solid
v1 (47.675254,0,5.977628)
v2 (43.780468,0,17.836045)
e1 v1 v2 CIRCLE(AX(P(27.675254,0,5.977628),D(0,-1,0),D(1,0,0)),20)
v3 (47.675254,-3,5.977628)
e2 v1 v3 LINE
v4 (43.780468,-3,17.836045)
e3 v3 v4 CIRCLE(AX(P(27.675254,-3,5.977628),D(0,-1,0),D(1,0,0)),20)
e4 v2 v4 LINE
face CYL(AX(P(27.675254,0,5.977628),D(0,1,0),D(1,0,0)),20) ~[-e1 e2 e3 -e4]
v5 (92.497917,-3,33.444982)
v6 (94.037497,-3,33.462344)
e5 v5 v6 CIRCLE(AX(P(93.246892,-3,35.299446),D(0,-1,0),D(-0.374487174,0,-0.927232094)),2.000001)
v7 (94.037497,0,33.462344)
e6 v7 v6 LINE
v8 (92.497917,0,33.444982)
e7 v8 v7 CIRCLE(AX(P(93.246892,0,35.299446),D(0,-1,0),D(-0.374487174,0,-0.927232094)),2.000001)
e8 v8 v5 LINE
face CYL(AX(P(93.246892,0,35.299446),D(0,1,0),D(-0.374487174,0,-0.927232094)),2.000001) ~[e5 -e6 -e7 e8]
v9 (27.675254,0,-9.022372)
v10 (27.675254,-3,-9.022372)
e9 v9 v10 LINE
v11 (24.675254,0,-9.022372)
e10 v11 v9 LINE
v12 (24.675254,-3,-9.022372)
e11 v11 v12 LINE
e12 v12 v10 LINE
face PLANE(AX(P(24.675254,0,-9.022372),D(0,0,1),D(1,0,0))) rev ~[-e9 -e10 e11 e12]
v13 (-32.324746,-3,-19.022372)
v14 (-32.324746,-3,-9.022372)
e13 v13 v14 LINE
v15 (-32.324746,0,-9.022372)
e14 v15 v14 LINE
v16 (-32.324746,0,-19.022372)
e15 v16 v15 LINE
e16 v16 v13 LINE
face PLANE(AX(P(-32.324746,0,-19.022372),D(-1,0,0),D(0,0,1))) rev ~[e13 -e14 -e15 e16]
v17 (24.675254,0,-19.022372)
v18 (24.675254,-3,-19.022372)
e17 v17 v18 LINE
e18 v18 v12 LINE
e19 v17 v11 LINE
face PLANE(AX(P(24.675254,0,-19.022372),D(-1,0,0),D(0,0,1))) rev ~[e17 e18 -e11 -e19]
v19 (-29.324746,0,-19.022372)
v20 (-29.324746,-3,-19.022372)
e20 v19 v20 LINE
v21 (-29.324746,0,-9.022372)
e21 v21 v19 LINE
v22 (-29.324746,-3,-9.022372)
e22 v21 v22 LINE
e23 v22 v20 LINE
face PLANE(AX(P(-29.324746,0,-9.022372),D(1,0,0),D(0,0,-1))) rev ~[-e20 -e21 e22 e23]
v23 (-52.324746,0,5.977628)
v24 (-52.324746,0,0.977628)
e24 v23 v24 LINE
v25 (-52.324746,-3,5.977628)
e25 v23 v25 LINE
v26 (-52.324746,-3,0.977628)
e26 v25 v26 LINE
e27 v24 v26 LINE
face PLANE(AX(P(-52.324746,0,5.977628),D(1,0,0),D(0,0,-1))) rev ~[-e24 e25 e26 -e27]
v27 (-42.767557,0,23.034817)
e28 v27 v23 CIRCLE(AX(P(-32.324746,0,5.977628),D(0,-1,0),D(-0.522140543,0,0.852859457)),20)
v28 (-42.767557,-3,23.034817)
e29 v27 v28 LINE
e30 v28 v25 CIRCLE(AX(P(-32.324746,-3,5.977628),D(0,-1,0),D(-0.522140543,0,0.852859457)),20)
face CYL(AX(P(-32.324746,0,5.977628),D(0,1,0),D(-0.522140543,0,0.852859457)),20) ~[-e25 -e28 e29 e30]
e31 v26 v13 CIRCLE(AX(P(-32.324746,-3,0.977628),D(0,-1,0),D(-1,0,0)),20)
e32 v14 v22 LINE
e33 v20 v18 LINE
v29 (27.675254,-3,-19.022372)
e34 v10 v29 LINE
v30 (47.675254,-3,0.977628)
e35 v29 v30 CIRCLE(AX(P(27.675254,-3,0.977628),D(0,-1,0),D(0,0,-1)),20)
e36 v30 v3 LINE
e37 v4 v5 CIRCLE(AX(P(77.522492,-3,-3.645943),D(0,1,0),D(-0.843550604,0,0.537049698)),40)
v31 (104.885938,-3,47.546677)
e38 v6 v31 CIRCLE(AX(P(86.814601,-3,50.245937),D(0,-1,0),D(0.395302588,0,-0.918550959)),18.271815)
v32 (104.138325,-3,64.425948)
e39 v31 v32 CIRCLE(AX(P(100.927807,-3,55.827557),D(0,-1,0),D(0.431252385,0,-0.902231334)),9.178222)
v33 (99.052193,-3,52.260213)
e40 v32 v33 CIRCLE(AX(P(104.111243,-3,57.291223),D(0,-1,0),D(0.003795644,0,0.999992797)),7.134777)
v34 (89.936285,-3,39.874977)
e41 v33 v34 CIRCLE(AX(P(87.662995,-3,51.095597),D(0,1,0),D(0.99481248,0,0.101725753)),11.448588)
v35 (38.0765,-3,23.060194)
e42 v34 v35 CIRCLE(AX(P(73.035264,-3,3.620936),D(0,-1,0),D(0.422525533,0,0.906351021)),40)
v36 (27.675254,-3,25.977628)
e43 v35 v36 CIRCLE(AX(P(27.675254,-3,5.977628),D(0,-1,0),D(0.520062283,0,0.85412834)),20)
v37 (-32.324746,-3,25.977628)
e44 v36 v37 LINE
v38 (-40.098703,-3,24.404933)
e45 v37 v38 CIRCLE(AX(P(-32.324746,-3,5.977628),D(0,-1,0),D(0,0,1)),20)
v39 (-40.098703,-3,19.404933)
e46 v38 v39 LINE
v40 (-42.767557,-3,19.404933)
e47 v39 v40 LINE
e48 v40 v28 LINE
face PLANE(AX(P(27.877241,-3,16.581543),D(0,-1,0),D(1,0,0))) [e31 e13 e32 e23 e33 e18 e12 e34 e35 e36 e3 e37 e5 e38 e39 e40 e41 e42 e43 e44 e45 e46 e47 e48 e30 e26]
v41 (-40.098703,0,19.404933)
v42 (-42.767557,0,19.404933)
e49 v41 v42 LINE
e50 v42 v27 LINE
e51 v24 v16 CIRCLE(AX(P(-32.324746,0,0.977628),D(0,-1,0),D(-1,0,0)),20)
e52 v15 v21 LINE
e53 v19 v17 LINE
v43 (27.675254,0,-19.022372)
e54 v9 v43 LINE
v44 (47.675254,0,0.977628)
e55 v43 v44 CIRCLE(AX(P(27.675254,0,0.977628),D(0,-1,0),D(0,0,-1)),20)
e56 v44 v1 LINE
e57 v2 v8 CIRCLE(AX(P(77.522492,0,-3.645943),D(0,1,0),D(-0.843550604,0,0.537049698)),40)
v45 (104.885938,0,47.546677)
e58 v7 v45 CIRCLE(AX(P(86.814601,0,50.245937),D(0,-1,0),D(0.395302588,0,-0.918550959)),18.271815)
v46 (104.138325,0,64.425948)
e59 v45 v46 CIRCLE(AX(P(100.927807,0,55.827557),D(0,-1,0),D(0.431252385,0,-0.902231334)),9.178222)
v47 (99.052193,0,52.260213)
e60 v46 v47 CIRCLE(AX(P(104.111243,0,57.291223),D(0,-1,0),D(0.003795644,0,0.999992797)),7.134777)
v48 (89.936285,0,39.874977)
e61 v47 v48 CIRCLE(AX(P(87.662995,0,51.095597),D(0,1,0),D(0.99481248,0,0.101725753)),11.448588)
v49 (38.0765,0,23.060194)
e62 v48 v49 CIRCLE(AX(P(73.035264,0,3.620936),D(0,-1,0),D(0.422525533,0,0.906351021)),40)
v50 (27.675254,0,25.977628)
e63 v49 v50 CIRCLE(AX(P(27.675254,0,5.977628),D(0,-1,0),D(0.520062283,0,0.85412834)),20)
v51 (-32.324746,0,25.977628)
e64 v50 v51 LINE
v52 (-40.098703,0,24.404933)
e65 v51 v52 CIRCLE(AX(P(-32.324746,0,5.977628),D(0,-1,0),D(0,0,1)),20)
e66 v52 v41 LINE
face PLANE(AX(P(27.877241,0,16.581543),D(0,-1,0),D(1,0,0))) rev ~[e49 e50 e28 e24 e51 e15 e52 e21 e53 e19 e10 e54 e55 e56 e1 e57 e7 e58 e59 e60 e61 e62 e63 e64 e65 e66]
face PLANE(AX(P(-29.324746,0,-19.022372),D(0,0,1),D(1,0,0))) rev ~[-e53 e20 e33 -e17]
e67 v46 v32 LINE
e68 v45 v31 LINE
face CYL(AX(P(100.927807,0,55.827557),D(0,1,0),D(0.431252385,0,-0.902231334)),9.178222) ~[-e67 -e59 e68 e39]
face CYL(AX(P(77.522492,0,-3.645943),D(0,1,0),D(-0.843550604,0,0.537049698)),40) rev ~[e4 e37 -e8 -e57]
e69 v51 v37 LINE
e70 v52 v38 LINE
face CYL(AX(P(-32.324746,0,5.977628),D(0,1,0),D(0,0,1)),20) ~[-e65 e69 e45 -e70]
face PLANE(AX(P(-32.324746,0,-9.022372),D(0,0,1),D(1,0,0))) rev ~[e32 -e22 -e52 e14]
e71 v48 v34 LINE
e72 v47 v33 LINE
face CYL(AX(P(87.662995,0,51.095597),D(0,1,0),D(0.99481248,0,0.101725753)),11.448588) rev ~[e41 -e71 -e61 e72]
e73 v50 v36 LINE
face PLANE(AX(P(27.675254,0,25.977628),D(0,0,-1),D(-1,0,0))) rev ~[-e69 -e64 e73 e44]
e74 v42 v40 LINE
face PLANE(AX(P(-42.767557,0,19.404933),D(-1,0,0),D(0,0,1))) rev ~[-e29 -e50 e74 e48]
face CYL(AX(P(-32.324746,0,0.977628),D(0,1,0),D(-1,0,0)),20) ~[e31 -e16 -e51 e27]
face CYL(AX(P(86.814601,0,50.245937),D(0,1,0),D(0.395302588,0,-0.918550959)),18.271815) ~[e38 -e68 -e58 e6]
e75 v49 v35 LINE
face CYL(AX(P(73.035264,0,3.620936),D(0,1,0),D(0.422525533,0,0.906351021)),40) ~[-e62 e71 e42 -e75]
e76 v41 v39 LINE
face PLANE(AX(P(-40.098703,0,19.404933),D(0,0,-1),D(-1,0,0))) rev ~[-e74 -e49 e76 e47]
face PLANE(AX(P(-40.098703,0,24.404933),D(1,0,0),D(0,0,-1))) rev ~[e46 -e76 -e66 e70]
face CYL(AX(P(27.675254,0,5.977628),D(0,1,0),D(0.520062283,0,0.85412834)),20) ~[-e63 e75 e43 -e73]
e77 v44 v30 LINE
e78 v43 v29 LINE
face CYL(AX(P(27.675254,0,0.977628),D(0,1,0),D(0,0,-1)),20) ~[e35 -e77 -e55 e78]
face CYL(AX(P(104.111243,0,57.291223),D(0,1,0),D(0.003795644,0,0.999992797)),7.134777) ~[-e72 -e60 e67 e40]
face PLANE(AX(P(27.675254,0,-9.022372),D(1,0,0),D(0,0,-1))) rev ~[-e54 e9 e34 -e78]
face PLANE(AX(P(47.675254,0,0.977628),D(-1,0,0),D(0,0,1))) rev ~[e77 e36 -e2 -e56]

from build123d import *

# Parameters (mm, degrees)
F1_DEPTH = 3


# Not quite as in the source:
# - ends of sketch curves that miss each other by under 0.0002 mm in the source are joined


with BuildPart() as f1:
    # F0 (on Front) → F1 (new body)
    with BuildSketch(Plane.XZ):
        with BuildLine():
            Line((27.6752540097, 25.9776275605), (-32.3247459903, 25.9776275605))
            ThreePointArc((-32.3247459903, 25.9776275605), (-36.2904670893, 25.5805114342), (-40.0987030081, 24.4049331771))
            Line((-40.0987030081, 24.4049331771), (-40.0987030081, 19.4049331771))
            Line((-40.0987030081, 19.4049331771), (-42.7675568515, 19.4049331771))
            Line((-42.7675568515, 19.4049331771), (-42.7675568515, 23.0348166993))
            ThreePointArc((-42.7675568515, 23.0348166993), (-49.7726143017, 15.7537152948), (-52.3247459903, 5.9776275605))
            Line((-52.3247459903, 5.9776275605), (-52.3247459903, 0.9776275605))
            ThreePointArc((-52.3247459903, 0.9776275605), (-46.4668816141, -13.1645080632), (-32.3247459903, -19.0223724395))
            Line((-32.3247459903, -19.0223724395), (-32.3247459903, -9.0223724395))
            Line((-32.3247459903, -9.0223724395), (-29.3247459903, -9.0223724395))
            Line((-29.3247459903, -9.0223724395), (-29.3247459903, -19.0223724395))
            Line((-29.3247459903, -19.0223724395), (24.6752540097, -19.0223724395))
            Line((24.6752540097, -19.0223724395), (24.6752540097, -9.0223724395))
            Line((24.6752540097, -9.0223724395), (27.6752540097, -9.0223724395))
            Line((27.6752540097, -9.0223724395), (27.6752540097, -19.0223724395))
            ThreePointArc((27.6752540097, -19.0223724395), (41.8173896334, -13.1645080632), (47.6752540097, 0.9776275605))
            Line((47.6752540097, 0.9776275605), (47.6752540097, 5.9776275605))
            ThreePointArc((47.6752540097, 5.9776275605), (46.6766261397, 12.2184493954), (43.7804682921, 17.8360453688))
            ThreePointArc((43.7804682921, 17.8360453688), (65.3177378121, 34.4466284435), (92.4979172096, 33.4449816105))
            ThreePointArc((92.4979172096, 33.4449816105), (93.2694445512, 33.2995729147), (94.0374965073, 33.4623435853))
            ThreePointArc((94.0374965073, 33.4623435853), (101.2901547391, 39.0961583347), (104.8859376265, 47.5466769297))
            ThreePointArc((104.8859376265, 47.5466769297), (110.0970401084, 56.2336783381), (104.1383245347, 64.4259484991))
            ThreePointArc((104.1383245347, 64.4259484991), (97.5285801831, 60.0432380566), (99.0521934878, 52.2602133107))
            ThreePointArc((99.0521934878, 52.2602133107), (96.8833215141, 44.3091582137), (89.9362853313, 39.8749765827))
            ThreePointArc((89.9362853313, 39.8749765827), (60.6981355661, 41.6708405362), (38.0764996773, 23.060194363))
            ThreePointArc((38.0764996773, 23.060194363), (33.0765808814, 25.2344618804), (27.6752540097, 25.9776275605))
        make_face()
    extrude(amount=F1_DEPTH)


solid = f1.part
